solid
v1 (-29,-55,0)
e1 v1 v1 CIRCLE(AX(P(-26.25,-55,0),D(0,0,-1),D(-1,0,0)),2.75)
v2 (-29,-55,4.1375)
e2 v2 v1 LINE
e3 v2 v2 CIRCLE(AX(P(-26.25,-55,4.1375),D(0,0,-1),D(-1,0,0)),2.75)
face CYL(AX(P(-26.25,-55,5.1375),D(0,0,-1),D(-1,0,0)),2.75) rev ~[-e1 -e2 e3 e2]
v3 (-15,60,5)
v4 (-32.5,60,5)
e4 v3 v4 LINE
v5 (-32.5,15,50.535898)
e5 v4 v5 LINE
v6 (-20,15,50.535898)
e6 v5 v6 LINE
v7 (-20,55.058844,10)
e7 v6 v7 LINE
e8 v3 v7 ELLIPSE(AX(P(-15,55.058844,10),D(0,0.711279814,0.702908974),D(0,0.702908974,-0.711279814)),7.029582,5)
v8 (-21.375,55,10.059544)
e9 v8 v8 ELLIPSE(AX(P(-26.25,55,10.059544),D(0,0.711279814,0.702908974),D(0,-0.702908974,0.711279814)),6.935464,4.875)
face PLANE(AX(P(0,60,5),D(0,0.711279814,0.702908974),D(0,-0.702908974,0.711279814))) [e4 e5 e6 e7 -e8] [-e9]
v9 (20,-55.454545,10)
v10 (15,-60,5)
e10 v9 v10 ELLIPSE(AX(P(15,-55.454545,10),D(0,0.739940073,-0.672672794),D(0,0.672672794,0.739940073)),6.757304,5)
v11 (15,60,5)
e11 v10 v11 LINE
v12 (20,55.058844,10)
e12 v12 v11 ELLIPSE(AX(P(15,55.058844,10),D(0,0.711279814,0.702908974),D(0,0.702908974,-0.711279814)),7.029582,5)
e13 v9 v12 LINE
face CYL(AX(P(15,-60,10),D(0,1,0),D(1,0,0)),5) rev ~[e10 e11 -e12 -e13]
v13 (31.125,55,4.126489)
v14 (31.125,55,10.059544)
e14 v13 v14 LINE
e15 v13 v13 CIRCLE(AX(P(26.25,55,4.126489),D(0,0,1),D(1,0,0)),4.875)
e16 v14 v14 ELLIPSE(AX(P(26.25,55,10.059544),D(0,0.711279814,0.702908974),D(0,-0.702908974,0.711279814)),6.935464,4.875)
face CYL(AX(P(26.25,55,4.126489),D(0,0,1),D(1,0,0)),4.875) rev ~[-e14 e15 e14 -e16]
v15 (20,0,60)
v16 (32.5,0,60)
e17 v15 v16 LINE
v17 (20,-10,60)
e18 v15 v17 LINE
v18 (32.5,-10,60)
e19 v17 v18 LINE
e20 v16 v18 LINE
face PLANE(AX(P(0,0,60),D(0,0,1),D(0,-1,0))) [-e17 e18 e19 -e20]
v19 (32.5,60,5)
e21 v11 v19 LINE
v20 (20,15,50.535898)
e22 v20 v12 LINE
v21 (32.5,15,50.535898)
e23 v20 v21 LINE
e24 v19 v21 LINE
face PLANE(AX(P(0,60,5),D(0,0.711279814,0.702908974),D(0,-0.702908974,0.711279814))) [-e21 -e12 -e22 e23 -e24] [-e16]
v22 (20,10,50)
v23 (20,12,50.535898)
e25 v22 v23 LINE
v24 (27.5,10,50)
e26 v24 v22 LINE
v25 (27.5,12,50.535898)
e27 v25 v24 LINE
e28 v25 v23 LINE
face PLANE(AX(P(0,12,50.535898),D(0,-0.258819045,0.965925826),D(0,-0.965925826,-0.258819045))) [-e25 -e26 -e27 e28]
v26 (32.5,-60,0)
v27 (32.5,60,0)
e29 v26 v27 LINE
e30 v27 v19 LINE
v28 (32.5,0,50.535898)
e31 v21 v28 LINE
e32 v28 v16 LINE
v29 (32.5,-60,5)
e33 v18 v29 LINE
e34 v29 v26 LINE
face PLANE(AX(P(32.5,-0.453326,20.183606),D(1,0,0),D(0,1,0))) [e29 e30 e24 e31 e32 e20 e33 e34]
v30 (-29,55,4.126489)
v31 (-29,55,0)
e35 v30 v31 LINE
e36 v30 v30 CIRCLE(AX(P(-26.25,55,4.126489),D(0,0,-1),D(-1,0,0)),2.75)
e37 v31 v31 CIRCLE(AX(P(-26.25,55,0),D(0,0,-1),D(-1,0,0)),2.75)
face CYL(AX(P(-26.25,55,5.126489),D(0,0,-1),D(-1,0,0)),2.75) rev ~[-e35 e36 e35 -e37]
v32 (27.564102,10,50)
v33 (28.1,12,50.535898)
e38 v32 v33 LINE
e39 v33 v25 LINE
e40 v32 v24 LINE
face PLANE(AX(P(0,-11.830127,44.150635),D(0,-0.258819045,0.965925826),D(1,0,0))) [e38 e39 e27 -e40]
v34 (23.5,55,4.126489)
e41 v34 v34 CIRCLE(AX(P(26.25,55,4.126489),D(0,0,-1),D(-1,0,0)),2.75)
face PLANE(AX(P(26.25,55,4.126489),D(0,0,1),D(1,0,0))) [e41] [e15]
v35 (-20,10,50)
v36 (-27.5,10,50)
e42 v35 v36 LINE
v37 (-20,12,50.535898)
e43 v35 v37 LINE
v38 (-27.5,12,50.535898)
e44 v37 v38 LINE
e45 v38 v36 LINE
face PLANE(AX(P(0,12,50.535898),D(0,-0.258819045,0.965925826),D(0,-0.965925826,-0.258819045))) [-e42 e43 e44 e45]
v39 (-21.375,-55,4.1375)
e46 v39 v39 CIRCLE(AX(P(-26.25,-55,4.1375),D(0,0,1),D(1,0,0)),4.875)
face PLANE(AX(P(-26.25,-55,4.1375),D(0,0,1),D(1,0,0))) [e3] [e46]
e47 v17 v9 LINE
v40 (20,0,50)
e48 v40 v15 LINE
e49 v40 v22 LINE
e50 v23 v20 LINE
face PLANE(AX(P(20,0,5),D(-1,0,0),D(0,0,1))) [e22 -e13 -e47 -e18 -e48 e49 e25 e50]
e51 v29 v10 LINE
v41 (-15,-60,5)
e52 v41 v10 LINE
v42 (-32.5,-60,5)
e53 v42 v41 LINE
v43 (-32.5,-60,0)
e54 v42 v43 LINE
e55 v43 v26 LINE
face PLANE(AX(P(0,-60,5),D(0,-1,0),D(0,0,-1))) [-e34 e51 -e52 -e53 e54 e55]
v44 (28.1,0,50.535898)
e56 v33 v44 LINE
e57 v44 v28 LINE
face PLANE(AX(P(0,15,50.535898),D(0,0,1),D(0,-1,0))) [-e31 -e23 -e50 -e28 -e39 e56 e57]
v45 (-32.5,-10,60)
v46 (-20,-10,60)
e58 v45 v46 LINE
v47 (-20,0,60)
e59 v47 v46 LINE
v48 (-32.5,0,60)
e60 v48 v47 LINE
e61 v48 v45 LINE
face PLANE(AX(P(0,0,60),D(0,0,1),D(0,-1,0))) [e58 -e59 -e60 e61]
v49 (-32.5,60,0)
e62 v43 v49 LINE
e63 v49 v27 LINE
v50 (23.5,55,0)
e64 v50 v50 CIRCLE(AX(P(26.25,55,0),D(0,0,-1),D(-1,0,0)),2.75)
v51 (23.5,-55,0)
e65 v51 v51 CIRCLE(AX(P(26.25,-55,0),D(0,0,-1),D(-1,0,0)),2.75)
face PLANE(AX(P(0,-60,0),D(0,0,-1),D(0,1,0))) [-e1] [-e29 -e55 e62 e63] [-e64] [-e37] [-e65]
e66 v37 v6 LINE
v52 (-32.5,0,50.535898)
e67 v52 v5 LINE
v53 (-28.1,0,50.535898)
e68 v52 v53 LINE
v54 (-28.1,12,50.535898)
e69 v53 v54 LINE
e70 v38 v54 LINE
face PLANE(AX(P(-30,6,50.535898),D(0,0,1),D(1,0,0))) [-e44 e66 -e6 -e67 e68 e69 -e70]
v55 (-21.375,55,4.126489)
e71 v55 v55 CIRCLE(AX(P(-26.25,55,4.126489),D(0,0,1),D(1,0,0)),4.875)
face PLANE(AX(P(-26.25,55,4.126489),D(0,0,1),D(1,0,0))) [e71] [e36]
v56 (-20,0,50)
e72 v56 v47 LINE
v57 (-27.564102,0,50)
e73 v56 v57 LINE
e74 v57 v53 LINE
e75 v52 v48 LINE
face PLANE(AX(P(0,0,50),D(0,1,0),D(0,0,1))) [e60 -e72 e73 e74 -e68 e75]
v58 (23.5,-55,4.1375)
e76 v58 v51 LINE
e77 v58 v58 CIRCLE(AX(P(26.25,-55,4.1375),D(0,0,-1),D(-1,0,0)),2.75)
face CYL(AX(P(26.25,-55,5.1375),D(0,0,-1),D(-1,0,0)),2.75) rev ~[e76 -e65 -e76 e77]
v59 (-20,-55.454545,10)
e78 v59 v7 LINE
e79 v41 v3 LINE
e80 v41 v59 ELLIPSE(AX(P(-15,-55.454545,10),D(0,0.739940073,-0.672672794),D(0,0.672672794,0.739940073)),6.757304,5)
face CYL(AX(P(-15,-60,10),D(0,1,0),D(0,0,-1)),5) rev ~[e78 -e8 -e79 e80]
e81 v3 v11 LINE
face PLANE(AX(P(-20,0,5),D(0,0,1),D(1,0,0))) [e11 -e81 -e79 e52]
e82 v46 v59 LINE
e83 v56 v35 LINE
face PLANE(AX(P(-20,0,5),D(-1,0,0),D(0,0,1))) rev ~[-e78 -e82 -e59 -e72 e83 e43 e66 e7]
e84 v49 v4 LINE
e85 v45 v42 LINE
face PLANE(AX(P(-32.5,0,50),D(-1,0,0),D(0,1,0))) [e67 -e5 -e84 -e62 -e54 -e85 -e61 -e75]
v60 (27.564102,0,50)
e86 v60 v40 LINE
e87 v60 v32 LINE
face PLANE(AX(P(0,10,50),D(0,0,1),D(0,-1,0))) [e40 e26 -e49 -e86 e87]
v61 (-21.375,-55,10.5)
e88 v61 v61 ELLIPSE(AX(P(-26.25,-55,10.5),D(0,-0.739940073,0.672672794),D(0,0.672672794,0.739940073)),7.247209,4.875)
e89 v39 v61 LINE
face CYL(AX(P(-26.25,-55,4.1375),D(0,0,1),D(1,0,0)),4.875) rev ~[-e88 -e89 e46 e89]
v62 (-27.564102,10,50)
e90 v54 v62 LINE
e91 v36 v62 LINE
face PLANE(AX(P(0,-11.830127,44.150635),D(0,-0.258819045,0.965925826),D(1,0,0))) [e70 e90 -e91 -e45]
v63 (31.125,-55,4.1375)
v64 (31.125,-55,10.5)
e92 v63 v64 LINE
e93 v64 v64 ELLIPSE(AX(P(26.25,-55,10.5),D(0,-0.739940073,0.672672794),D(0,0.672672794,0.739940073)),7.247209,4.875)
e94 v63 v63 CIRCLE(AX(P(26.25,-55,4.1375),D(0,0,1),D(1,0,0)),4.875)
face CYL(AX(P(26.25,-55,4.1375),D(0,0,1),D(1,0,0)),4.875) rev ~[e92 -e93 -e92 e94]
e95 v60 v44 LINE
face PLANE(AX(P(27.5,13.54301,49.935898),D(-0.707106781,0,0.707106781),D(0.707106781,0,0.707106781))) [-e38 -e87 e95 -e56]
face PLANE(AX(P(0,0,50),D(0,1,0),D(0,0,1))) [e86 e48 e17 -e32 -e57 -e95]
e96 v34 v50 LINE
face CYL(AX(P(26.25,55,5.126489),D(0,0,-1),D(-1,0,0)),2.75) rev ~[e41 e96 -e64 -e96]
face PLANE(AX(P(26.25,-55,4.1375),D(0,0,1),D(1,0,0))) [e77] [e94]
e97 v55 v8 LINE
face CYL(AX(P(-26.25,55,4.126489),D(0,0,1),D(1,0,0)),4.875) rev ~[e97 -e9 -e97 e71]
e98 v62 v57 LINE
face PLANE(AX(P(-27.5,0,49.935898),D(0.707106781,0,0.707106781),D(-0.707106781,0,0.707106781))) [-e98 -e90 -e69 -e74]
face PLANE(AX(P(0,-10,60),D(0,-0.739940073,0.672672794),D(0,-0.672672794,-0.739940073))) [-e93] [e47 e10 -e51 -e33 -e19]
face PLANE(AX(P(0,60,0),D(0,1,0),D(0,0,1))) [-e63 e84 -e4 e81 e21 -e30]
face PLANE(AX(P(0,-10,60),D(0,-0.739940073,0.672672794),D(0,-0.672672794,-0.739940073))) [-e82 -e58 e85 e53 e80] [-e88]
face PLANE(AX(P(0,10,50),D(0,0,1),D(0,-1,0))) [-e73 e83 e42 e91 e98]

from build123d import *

# Parameters (mm, degrees)
F1_DEPTH       = 32.5
F2_W           = 40
F2_H           = 55
F3_DEPTH       = 60.001
F3_DEPTH_BACK  = 60.001
F4_R           = 5
F6_D           = 5.5
F6_START       = 44.8625
F6_START_2     = 44.8735114
F6_CBORE_D     = 9.75
F6_CBORE_DEPTH = 1
F7_W           = 5
F7_H           = 12
F8_DEPTH       = 0.5358983849
F9_T4_DEPTH    = 13.5430097928
F9_T10_DEPTH   = 13.5430097928


# Not quite as in the source:
# - a fillet or chamfer that OpenCascade refuses, or shapes differently, is made with other operations: its cross-section is extruded or revolved along the edge and cut away or added


with BuildPart() as f1:
    # F0 (on Right) → F1 (new body, symmetric)
    with BuildSketch(Plane.YZ):
        Polygon((0, 50), (0, 60), (-10, 60), (-60, 5), (-60, 0), (60, 0), (60, 5), (15, 50.5358983849), (12, 50.5358983849), (10, 50), align=None)
    extrude(amount=F1_DEPTH, both=True)

    # F2 (on Front) → F3 (cut, two sides)
    with BuildSketch(Plane.XZ) as f3_sk:
        with Locations((0, 32.5)):
            Rectangle(F2_W, F2_H)
    extrude(amount=-F3_DEPTH, mode=Mode.SUBTRACT)
    extrude(f3_sk.sketch, amount=F3_DEPTH_BACK, mode=Mode.SUBTRACT)

    # F4
    f4_edges = [f1.edges().sort_by_distance(p)[0] for p in [
        (20, 0, 5),
        (-20, 0, 5),
    ]]
    fillet(f4_edges, radius=F4_R)

    # F6 (through all)
    # its depths count from where the whole tool has entered the part; down to there all is cleared
    with Locations(Plane.XY.offset(50)):
        with Locations((-26.25, 55, -F6_START_2), (26.25, 55, -F6_START_2), (-26.25, -55, -F6_START), (26.25, -55, -F6_START)):
            CounterBoreHole(F6_D / 2, F6_CBORE_D / 2, F6_CBORE_DEPTH)

    # F7 (on face) → F8 (join, through all)
    with BuildSketch(Plane.XY.offset(50)):
        with Locations((-30, 6)):
            Rectangle(F7_W, F7_H)
        with Locations((30, 6)):
            Rectangle(F7_W, F7_H)
    extrude(amount=F8_DEPTH)

    # F9: chamfer of 0.6 on 2 edges, made by hand


with BuildPart() as f9_tool2:
    # F9_s3 → F9_t4 (new body)
    with BuildSketch(Plane.XZ.offset(-13.5430097928)):
        Polygon((27.5, 49.9358983849), (28.1, 50.5358983849), (27.5, 50.5358983849), align=None)
    extrude(amount=F9_T4_DEPTH)

    split(bisect_by=Plane(origin=(0, -11.8301270189, 44.1506350946), x_dir=(1, 0, 0), z_dir=(0, -0.2588190451, 0.9659258263)), keep=Keep.TOP)

    split(bisect_by=Plane.XY.offset(50), keep=Keep.TOP)


with BuildPart() as f1_1:
    add(f1.part)

    # F9_t1: cut F9_tool2
    add(f9_tool2.part, mode=Mode.SUBTRACT)


with BuildPart() as f9_tool8:
    # F9_s9 → F9_t10 (new body)
    with BuildSketch(Plane.XZ):
        Polygon((-27.5, 49.9358983849), (-28.1, 50.5358983849), (-27.5, 50.5358983849), align=None)
    extrude(amount=-F9_T10_DEPTH)

    split(bisect_by=Plane(origin=(0, -11.8301270189, 44.1506350946), x_dir=(1, 0, 0), z_dir=(0, -0.2588190451, 0.9659258263)), keep=Keep.TOP)

    split(bisect_by=Plane.XY.offset(50), keep=Keep.TOP)


with BuildPart() as f1_2:
    add(f1_1.part)

    # F9_t7: cut F9_tool8
    add(f9_tool8.part, mode=Mode.SUBTRACT)


solid = f1_2.part
